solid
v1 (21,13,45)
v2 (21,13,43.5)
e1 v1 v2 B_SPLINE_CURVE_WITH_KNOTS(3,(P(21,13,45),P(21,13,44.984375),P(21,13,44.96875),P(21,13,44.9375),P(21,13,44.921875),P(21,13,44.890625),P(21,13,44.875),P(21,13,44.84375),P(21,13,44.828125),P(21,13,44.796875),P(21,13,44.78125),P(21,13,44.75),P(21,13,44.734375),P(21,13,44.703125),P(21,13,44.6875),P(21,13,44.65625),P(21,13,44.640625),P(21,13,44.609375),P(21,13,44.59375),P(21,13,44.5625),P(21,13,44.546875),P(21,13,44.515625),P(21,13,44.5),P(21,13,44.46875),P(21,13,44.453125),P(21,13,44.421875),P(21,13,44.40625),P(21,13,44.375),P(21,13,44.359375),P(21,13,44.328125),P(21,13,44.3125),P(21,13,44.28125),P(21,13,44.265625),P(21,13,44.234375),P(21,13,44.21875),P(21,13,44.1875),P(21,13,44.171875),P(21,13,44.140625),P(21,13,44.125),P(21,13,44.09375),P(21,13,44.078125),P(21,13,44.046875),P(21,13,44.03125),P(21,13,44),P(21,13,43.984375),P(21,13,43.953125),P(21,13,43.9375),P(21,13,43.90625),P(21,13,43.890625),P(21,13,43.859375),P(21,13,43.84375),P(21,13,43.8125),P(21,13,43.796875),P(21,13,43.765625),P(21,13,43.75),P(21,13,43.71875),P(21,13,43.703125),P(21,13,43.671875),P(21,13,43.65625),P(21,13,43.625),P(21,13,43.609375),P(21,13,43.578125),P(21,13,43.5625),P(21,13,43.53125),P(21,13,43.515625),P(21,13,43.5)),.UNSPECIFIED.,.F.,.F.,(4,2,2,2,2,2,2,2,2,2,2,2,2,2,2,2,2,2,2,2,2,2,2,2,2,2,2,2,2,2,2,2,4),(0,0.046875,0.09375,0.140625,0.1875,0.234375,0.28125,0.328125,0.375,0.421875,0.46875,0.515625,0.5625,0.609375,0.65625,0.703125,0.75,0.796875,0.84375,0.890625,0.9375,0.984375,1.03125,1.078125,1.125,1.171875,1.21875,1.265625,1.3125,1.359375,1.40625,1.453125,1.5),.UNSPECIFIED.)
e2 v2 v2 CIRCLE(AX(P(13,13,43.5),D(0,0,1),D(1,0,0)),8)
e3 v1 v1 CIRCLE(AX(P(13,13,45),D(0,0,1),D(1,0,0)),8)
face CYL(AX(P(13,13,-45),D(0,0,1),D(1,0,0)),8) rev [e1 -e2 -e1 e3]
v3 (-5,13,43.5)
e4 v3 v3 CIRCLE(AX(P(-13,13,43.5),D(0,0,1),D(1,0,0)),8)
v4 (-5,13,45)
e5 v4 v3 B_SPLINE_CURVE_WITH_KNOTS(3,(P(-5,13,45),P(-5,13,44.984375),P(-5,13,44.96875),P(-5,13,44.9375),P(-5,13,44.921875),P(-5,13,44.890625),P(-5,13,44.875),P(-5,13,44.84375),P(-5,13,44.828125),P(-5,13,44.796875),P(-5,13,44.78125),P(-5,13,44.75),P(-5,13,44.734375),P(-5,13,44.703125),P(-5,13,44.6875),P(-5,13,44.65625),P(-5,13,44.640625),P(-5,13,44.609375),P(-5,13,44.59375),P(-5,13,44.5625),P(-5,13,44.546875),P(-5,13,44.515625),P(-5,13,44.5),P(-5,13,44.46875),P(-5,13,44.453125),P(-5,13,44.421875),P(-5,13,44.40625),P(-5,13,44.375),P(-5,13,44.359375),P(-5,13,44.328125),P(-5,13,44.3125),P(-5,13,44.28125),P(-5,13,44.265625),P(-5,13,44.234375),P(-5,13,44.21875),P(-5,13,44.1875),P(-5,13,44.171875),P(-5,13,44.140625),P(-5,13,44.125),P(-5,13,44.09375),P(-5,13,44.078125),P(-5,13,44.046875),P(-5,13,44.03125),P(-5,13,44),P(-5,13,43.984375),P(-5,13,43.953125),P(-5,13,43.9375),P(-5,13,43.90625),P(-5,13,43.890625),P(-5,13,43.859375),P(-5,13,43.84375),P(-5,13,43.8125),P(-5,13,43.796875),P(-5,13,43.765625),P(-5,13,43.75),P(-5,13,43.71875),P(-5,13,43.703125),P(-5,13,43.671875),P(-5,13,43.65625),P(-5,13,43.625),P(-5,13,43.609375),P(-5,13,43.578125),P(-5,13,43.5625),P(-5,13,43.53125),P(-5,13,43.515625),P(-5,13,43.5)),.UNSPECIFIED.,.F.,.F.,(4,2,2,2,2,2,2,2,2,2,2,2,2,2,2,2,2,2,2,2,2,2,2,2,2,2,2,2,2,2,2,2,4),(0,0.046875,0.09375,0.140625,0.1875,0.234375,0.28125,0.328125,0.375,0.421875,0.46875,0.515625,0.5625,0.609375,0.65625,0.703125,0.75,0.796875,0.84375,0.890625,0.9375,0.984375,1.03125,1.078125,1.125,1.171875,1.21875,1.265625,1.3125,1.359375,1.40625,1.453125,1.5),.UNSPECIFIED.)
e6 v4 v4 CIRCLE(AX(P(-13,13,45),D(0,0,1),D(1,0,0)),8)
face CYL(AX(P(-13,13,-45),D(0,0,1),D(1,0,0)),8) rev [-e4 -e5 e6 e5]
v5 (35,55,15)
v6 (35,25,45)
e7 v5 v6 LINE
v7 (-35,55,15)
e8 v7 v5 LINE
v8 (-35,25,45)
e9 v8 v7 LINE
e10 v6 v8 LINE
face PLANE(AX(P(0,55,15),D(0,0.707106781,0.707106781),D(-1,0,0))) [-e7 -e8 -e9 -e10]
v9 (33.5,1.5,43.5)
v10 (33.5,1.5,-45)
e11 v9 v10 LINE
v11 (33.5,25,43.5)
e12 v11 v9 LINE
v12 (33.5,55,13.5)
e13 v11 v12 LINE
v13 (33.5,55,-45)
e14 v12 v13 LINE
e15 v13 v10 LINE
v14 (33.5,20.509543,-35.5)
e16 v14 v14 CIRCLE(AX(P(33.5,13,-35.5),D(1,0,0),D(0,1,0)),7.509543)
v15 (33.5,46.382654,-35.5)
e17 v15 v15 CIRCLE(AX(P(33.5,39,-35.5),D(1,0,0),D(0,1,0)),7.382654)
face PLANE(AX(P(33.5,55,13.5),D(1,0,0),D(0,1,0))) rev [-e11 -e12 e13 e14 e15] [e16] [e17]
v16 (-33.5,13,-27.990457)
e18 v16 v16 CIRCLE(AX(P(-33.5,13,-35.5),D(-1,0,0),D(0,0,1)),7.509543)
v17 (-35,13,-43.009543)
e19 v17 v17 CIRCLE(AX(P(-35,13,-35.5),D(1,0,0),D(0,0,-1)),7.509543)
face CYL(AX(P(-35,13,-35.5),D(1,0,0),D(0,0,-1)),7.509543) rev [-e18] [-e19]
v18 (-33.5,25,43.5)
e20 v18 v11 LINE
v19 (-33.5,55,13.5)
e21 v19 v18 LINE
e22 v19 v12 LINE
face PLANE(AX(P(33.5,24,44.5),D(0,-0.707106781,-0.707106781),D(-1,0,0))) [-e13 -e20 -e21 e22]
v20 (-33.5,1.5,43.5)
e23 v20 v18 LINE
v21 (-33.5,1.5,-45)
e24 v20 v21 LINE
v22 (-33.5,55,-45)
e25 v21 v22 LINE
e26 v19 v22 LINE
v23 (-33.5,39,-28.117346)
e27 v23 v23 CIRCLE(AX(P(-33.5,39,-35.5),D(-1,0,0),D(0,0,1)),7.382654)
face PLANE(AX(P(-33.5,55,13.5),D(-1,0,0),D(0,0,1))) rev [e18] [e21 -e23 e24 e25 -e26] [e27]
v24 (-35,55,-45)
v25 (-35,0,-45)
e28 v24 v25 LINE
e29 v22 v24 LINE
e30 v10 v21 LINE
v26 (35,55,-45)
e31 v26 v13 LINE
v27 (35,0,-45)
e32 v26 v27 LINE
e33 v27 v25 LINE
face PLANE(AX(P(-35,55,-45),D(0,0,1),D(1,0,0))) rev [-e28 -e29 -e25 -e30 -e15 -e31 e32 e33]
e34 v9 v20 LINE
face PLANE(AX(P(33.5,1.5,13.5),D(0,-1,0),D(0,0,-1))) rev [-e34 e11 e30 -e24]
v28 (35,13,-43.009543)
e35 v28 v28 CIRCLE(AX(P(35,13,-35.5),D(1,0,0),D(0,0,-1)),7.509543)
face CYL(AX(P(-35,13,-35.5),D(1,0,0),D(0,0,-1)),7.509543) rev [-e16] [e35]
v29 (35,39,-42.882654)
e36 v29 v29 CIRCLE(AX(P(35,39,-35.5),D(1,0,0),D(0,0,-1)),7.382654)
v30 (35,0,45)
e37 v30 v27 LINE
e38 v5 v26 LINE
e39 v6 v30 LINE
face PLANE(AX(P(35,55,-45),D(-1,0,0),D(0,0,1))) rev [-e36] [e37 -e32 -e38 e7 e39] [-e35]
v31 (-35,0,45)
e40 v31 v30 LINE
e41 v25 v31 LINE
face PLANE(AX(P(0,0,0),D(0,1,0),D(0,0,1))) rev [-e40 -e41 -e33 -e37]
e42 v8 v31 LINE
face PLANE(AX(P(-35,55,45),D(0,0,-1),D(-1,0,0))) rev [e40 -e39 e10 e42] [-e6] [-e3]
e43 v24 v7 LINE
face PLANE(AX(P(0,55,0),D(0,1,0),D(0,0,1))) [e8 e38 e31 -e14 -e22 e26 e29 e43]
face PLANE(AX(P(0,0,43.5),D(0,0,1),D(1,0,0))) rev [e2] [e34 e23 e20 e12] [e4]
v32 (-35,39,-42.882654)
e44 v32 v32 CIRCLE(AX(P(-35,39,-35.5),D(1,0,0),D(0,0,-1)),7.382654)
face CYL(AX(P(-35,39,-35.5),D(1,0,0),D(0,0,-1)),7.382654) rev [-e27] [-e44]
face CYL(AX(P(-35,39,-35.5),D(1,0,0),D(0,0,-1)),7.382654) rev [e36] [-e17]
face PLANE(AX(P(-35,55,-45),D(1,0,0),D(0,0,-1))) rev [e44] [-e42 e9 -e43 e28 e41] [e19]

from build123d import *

# Parameters (mm, degrees)
ESBO_O1_W                = 70
ESBO_O1_H                = 90
RESSALTO_EXTRUS_O1_DEPTH = 55
CHANFRO1_SIZE            = 30
ESBO_O3_W                = 67
ESBO_O3_H                = 53.5
CORTE_EXTRUS_O1_DEPTH    = 58.5
ESBO_O5_W                = 67
ESBO_O5_H                = 22.5
CORTE_EXTRUS_O3_DEPTH    = 30
CHANFRO2_SIZE            = 31
ESBO_O4_R                = 8
CORTE_EXTRUS_O4_DEPTH    = 112.130553854
ESBO_O6_R                = 7.509542532
ESBO_O6_R_2              = 7.382654188
CORTE_EXTRUS_O5_DEPTH    = 100.749686716


with BuildPart() as part:
    # Esboço1 → Ressalto-extrusão1 (new body)
    with BuildSketch(Plane(origin=(0, 0, 0), x_dir=(1, 0, 0), z_dir=(0, 1, 0))):
        Rectangle(ESBO_O1_W, ESBO_O1_H)
    extrude(amount=RESSALTO_EXTRUS_O1_DEPTH)

    # Chanfro1
    chanfro1_edges = [part.edges().sort_by_distance(p)[0] for p in [
        (0, 55, 45),
    ]]
    chamfer(chanfro1_edges, length=CHANFRO1_SIZE)

    # Esboço3 → Corte-extrusão1 (cut)
    with BuildSketch(Plane(origin=(0, 0, -45), x_dir=(-1, 0, 0), z_dir=(0, 0, -1))):
        with Locations((0, 28.25)):
            Rectangle(ESBO_O3_W, ESBO_O3_H)
    extrude(amount=-CORTE_EXTRUS_O1_DEPTH, mode=Mode.SUBTRACT)

    # Esboço5 → Corte-extrusão3 (cut)
    with BuildSketch(Plane(origin=(0, 0, 13.5), x_dir=(-1, 0, 0), z_dir=(0, 0, -1))):
        with Locations((0, 12.75)):
            Rectangle(ESBO_O5_W, ESBO_O5_H)
    extrude(amount=-CORTE_EXTRUS_O3_DEPTH, mode=Mode.SUBTRACT)

    # Chanfro2
    # the kernel refuses this chamfer: 31 mm, written as the material it takes off along each edge
    with BuildSketch(Plane(origin=(-33.5, 24, 13.5), x_dir=(0, -0.027495876610586407, 0.9996219169112968), z_dir=(1, 0, 0))) as chanfro2_piece_1_section:
        Polygon((CHANFRO2_SIZE * 0.999621916911, -CHANFRO2_SIZE * 0.0274958766106), (-CHANFRO2_SIZE * 0.0274958766106, -CHANFRO2_SIZE * 0.999621916911), (0, 0), align=None)
    chanfro2_piece_1 = extrude(amount=67, mode=Mode.PRIVATE)
    chanfro2_piece_1 = split(chanfro2_piece_1, bisect_by=Plane(origin=(0, 34.34375, 43.5), z_dir=(0, 0, -1)), keep=Keep.TOP, mode=Mode.PRIVATE)
    add(chanfro2_piece_1, mode=Mode.SUBTRACT)

    # Esboço4 → Corte-extrusão4 (cut, through all)
    with BuildSketch(Plane.XY.offset(45)):
        with Locations((13, 13)):
            Circle(ESBO_O4_R)
        with Locations((-13, 13)):
            Circle(ESBO_O4_R)
    extrude(amount=-CORTE_EXTRUS_O4_DEPTH, mode=Mode.SUBTRACT)

    # Esboço6 → Corte-extrusão5 (cut, through all)
    with BuildSketch(Plane(origin=(35, 0, 0), x_dir=(0, 0, -1), z_dir=(1, 0, 0))):
        with Locations((35.5, 13)):
            Circle(ESBO_O6_R)
        with Locations((35.5, 39)):
            Circle(ESBO_O6_R_2)
    extrude(amount=-CORTE_EXTRUS_O5_DEPTH, mode=Mode.SUBTRACT)


solid = part.part
